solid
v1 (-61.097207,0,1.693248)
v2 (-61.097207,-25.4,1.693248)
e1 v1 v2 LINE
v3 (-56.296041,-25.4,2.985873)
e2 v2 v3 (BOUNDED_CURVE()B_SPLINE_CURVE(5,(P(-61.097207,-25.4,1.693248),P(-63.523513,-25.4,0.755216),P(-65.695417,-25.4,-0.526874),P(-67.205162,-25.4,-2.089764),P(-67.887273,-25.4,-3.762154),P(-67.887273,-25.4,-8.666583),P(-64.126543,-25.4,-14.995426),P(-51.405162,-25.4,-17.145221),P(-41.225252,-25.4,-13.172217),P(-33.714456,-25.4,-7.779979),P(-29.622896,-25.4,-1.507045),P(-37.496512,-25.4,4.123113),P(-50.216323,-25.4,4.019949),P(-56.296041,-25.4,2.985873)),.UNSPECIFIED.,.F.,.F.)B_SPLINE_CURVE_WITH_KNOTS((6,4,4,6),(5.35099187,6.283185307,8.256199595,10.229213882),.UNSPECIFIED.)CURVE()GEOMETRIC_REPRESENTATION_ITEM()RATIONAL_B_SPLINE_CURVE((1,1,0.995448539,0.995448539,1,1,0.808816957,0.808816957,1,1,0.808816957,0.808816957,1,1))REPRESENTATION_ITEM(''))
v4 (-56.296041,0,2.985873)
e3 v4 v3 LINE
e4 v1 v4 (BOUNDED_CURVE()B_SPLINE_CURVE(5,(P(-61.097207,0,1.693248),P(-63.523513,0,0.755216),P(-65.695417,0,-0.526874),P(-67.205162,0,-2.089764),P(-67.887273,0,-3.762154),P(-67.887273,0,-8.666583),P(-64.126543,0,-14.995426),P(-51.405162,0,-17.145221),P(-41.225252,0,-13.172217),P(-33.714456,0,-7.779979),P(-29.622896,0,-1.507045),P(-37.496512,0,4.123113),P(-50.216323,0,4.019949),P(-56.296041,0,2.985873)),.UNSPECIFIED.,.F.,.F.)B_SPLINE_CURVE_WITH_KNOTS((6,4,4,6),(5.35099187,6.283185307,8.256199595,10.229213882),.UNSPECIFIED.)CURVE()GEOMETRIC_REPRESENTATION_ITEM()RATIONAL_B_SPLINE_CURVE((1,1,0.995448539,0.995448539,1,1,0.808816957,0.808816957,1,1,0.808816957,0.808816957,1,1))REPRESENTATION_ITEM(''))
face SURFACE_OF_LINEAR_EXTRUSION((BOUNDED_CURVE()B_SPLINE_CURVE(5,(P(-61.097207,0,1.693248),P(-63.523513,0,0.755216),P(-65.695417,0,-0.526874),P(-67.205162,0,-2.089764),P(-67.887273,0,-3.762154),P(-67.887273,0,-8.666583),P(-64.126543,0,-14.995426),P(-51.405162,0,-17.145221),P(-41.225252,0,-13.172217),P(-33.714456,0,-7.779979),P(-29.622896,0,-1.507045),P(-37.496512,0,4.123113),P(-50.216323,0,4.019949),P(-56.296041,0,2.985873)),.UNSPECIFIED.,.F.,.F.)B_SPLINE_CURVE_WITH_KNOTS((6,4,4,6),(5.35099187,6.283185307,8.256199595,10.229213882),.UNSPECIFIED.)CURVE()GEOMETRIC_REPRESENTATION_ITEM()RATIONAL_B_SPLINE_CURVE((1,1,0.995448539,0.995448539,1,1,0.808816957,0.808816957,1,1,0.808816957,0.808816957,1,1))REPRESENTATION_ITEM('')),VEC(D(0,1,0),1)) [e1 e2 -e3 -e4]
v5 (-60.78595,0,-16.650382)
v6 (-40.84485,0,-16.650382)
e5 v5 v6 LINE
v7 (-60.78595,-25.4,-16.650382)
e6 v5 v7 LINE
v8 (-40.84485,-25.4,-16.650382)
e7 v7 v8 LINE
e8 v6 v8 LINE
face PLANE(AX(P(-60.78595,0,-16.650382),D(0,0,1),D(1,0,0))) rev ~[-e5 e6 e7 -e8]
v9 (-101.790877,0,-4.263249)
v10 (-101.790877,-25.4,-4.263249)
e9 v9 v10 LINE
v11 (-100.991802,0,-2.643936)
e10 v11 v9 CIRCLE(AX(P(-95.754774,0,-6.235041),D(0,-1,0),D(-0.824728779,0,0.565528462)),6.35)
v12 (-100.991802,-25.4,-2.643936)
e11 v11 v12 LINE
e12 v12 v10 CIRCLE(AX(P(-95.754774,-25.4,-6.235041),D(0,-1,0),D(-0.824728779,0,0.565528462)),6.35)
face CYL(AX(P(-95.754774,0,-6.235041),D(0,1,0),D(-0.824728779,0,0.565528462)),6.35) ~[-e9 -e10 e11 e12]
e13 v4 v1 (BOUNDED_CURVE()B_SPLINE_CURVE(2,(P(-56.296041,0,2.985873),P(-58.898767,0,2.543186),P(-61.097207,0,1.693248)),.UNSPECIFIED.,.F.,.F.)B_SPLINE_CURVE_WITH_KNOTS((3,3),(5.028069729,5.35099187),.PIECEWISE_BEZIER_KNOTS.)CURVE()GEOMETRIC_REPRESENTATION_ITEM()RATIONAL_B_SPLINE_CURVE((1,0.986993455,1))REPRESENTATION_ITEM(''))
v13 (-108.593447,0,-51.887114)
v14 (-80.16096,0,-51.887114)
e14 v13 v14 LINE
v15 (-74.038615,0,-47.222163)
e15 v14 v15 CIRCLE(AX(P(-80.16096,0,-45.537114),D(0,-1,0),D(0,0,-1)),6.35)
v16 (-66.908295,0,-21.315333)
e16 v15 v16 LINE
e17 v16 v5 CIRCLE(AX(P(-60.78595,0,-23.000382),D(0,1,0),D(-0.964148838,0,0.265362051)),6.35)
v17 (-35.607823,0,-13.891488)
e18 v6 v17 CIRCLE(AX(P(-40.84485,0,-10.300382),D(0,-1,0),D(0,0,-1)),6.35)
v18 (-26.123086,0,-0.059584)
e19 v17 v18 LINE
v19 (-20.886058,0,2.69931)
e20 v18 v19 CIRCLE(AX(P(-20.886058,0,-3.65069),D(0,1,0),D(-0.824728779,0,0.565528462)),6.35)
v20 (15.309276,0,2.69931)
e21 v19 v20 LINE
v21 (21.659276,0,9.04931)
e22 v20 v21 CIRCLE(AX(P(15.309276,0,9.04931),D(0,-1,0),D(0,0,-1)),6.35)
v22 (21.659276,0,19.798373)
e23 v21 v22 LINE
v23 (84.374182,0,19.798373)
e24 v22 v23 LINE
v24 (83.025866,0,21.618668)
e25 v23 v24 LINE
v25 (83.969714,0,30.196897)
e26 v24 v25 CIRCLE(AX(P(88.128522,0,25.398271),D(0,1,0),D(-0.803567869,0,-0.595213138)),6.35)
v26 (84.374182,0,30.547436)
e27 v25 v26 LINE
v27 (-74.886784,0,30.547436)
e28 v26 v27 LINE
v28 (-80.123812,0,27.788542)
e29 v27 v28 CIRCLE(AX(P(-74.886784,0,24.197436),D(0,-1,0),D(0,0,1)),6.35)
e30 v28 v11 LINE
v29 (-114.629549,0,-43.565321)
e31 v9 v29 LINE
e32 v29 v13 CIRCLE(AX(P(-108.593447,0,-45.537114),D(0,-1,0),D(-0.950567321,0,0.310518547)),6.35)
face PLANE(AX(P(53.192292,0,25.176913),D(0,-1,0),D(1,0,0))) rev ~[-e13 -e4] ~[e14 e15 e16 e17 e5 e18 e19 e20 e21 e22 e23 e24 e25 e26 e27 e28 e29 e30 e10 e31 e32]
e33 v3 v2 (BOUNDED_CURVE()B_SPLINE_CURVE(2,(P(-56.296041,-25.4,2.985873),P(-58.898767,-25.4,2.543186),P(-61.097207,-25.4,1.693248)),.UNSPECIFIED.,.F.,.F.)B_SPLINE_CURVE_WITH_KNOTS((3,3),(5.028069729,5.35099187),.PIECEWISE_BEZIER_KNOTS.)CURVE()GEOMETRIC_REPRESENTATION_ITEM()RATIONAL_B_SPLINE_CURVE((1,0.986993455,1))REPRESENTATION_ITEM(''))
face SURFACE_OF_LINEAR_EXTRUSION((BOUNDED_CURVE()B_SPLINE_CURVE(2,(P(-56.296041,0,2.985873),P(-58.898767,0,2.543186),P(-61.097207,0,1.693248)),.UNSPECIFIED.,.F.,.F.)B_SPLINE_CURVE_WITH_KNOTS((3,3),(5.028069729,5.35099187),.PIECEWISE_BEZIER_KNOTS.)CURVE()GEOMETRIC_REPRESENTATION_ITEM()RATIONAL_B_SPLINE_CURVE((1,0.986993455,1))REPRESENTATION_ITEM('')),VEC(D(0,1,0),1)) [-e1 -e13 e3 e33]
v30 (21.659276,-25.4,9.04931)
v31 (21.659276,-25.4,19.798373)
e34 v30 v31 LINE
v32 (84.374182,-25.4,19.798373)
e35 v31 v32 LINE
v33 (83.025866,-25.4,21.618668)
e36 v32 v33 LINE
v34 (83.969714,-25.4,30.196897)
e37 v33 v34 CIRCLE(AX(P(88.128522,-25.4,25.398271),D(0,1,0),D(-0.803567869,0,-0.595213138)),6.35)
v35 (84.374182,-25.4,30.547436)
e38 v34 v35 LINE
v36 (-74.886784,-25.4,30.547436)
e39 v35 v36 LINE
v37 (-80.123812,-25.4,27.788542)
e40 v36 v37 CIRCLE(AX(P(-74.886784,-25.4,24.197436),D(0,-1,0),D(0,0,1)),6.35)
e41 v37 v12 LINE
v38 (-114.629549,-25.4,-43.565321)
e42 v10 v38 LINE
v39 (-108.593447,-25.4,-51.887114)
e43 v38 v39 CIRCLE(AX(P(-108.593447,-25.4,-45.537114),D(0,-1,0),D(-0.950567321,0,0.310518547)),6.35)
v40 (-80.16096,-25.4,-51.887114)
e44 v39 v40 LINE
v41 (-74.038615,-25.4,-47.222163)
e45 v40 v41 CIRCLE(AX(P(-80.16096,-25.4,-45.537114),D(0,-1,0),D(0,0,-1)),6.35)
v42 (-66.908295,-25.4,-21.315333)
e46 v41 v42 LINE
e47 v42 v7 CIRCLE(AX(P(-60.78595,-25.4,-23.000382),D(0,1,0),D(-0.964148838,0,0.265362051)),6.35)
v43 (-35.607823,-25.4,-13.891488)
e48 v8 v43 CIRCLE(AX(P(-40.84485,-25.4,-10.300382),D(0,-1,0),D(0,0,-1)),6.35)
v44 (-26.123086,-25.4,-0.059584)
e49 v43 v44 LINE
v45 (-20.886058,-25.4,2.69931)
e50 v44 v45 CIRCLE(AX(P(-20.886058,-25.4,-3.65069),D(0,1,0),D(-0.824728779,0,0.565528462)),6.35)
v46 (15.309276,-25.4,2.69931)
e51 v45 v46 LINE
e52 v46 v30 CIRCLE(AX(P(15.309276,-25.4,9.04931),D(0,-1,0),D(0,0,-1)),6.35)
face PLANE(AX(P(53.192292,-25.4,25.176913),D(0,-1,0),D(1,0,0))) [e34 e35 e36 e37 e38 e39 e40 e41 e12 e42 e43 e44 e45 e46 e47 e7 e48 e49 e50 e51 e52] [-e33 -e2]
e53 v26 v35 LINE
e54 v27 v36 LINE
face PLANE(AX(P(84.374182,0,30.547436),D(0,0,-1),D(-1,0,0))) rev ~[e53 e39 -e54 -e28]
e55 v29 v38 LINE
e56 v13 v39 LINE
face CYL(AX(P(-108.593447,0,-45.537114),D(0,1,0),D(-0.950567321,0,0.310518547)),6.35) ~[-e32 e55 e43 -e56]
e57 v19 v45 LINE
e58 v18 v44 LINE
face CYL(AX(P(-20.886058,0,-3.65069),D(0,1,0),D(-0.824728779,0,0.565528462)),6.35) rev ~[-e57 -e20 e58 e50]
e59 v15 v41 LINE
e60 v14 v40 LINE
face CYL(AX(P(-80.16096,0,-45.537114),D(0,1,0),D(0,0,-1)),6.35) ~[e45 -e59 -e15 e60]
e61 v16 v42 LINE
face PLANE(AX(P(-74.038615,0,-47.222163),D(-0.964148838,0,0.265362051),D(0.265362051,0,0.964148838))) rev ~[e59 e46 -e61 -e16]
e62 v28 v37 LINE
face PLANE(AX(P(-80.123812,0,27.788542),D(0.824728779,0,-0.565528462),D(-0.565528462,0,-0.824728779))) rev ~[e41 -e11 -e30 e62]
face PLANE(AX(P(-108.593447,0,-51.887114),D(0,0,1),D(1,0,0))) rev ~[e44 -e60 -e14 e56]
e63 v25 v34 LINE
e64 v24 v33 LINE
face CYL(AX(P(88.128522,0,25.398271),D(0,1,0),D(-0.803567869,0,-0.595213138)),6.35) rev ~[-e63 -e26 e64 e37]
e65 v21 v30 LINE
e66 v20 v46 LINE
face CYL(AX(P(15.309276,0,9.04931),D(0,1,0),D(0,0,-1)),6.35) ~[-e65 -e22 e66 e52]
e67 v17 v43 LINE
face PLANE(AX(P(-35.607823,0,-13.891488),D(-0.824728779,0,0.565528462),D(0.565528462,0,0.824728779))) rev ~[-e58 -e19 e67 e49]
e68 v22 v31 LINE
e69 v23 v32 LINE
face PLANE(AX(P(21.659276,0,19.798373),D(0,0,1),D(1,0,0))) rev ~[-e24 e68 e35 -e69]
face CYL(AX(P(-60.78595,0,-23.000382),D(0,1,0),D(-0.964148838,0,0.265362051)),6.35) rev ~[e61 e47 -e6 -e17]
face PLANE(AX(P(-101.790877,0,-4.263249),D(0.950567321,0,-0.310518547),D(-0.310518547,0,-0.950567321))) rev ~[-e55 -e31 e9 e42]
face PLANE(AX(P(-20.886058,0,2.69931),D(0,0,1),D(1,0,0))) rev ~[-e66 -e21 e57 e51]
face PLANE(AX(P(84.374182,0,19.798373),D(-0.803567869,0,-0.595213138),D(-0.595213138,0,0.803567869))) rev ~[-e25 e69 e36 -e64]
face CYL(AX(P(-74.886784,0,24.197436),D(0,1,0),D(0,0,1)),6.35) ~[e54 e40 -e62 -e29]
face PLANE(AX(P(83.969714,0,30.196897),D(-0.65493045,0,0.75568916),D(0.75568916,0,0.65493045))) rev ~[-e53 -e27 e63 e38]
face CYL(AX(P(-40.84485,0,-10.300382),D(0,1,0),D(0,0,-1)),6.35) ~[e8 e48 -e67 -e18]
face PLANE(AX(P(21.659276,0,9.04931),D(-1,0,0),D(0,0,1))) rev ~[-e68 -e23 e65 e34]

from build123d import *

# Parameters (mm, degrees)
F1_DEPTH = 25.4
F3_DEPTH = 25.4
F4_DEPTH = 25.4


# Not quite as in the source:
# - a feature names something its author has since deleted; it is built from what else it names


with BuildPart() as f1:
    # F0 (on Front) → F1 (new body)
    with BuildSketch(Plane.XZ):
        with BuildLine():
            Line((84.3741819263, 30.5474363267), (21.6592755169, 30.5474363267))
            Line((21.6592755169, 30.5474363267), (21.6592755169, 19.7983730762))
            Line((21.6592755169, 19.7983730762), (84.3741819263, 19.7983730762))
            Line((84.3741819263, 19.7983730762), (83.0258661007, 21.6186676974))
            ThreePointArc((83.0258661007, 21.6186676974), (81.8166137912, 26.0927593628), (83.9697137101, 30.196897289))
            Line((83.9697137101, 30.196897289), (84.3741819263, 30.5474363267))
        make_face()
        with BuildLine():
            Line((21.6592755169, 19.7983730762), (21.6592755169, 30.5474363267))
            Line((21.6592755169, 30.5474363267), (-74.8867837768, 30.5474363267))
            ThreePointArc((-74.8867837768, 30.5474363267), (-77.8464272175, 29.8155330422), (-80.1238115226, 27.7885420603))
            Line((-80.1238115226, 27.7885420603), (-100.9918020349, -2.643935684))
            ThreePointArc((-100.9918020349, -2.643935684), (-101.4491934819, -3.425043187), (-101.7908767788, -4.2632486461))
            Line((-101.7908767788, -4.2632486461), (-114.6295490787, -43.5653208295))
            ThreePointArc((-114.6295490787, -43.5653208295), (-113.7336500917, -49.2654923305), (-108.593446589, -51.887113601))
            Line((-108.593446589, -51.887113601), (-80.1609597975, -51.887113601))
            ThreePointArc((-80.1609597975, -51.887113601), (-76.3124250948, -50.5879828967), (-74.0386146752, -47.2221626222))
            Line((-74.0386146752, -47.2221626222), (-66.9082951101, -21.3153334082))
            ThreePointArc((-66.9082951101, -21.3153334082), (-64.6344846905, -17.9495131337), (-60.7859499878, -16.6503824294))
            Line((-60.7859499878, -16.6503824294), (-40.8448504228, -16.6503824294))
            ThreePointArc((-40.8448504228, -16.6503824294), (-37.8852069821, -15.9184791448), (-35.607822677, -13.8914881629))
            Line((-35.607822677, -13.8914881629), (-26.1230860721, -0.0595844409))
            ThreePointArc((-26.1230860721, -0.0595844409), (-23.845701767, 1.967406541), (-20.8860583263, 2.6993098256))
            Line((-20.8860583263, 2.6993098256), (15.3092755169, 2.6993098256))
            ThreePointArc((15.3092755169, 2.6993098256), (19.7994035774, 4.5591817651), (21.6592755169, 9.0493098256))
            Line((21.6592755169, 9.0493098256), (21.6592755169, 19.7983730762))
        make_face()
    extrude(amount=F1_DEPTH)

    # F2 (on Front) → F3 (join)
    with BuildSketch(Plane.XZ):
        with BuildLine():
            add(Edge.make_bspline(
                [(-61.0972069937, 1.6932484379), (-67.8872726858, -0.9318532182), (-67.8872726858, -5.3358376026)],
                knots=[5.35099187, 5.35099187, 5.35099187, 6.2831853072, 6.2831853072, 6.2831853072], degree=2, weights=[1, 0.8933292345, 1]))
            add(Edge.make_bspline(
                [(-67.8872726858, -5.3358376026), (-67.8872726858, -32.3137216), (-37.4698541145, -10.4760980565), (-7.0524355433, 11.3615254871), (-56.2960408601, 2.9858730785)],
                knots=[0, 0, 0, 2.5140348645, 2.5140348645, 5.028069729, 5.028069729, 5.028069729], degree=2, weights=[1, 0.3086552179, 1, 0.3086552179, 1]))
            Line((-56.2960408601, 2.9858730785), (-51.4948747264, -11.1421316456))
            Line((-51.4948747264, -11.1421316456), (-61.0972069937, 1.6932484379))
        make_face()
        with BuildLine():
            Line((-51.4948747264, -11.1421316456), (-56.2960408601, 2.9858730785))
            add(Edge.make_bspline(
                [(-56.2960408601, 2.9858730785), (-58.8987667134, 2.5431856082), (-61.0972069937, 1.6932484379)],
                knots=[5.028069729, 5.028069729, 5.028069729, 5.35099187, 5.35099187, 5.35099187], degree=2, weights=[1, 0.9869934546, 1]))
            Line((-61.0972069937, 1.6932484379), (-51.4948747264, -11.1421316456))
        make_face()
    extrude(amount=F3_DEPTH)

    # F2 (on Front) → F4 (cut)
    with BuildSketch(Plane.XZ):
        with BuildLine():
            add(Edge.make_bspline(
                [(-61.0972069937, 1.6932484379), (-67.8872726858, -0.9318532182), (-67.8872726858, -5.3358376026)],
                knots=[5.35099187, 5.35099187, 5.35099187, 6.2831853072, 6.2831853072, 6.2831853072], degree=2, weights=[1, 0.8933292345, 1]))
            add(Edge.make_bspline(
                [(-67.8872726858, -5.3358376026), (-67.8872726858, -32.3137216), (-37.4698541145, -10.4760980565), (-7.0524355433, 11.3615254871), (-56.2960408601, 2.9858730785)],
                knots=[0, 0, 0, 2.5140348645, 2.5140348645, 5.028069729, 5.028069729, 5.028069729], degree=2, weights=[1, 0.3086552179, 1, 0.3086552179, 1]))
            Line((-56.2960408601, 2.9858730785), (-51.4948747264, -11.1421316456))
            Line((-51.4948747264, -11.1421316456), (-61.0972069937, 1.6932484379))
        make_face()
        with BuildLine():
            Line((-51.4948747264, -11.1421316456), (-56.2960408601, 2.9858730785))
            add(Edge.make_bspline(
                [(-56.2960408601, 2.9858730785), (-58.8987667134, 2.5431856082), (-61.0972069937, 1.6932484379)],
                knots=[5.028069729, 5.028069729, 5.028069729, 5.35099187, 5.35099187, 5.35099187], degree=2, weights=[1, 0.9869934546, 1]))
            Line((-61.0972069937, 1.6932484379), (-51.4948747264, -11.1421316456))
        make_face()
    extrude(amount=F4_DEPTH, mode=Mode.SUBTRACT)


solid = f1.part
